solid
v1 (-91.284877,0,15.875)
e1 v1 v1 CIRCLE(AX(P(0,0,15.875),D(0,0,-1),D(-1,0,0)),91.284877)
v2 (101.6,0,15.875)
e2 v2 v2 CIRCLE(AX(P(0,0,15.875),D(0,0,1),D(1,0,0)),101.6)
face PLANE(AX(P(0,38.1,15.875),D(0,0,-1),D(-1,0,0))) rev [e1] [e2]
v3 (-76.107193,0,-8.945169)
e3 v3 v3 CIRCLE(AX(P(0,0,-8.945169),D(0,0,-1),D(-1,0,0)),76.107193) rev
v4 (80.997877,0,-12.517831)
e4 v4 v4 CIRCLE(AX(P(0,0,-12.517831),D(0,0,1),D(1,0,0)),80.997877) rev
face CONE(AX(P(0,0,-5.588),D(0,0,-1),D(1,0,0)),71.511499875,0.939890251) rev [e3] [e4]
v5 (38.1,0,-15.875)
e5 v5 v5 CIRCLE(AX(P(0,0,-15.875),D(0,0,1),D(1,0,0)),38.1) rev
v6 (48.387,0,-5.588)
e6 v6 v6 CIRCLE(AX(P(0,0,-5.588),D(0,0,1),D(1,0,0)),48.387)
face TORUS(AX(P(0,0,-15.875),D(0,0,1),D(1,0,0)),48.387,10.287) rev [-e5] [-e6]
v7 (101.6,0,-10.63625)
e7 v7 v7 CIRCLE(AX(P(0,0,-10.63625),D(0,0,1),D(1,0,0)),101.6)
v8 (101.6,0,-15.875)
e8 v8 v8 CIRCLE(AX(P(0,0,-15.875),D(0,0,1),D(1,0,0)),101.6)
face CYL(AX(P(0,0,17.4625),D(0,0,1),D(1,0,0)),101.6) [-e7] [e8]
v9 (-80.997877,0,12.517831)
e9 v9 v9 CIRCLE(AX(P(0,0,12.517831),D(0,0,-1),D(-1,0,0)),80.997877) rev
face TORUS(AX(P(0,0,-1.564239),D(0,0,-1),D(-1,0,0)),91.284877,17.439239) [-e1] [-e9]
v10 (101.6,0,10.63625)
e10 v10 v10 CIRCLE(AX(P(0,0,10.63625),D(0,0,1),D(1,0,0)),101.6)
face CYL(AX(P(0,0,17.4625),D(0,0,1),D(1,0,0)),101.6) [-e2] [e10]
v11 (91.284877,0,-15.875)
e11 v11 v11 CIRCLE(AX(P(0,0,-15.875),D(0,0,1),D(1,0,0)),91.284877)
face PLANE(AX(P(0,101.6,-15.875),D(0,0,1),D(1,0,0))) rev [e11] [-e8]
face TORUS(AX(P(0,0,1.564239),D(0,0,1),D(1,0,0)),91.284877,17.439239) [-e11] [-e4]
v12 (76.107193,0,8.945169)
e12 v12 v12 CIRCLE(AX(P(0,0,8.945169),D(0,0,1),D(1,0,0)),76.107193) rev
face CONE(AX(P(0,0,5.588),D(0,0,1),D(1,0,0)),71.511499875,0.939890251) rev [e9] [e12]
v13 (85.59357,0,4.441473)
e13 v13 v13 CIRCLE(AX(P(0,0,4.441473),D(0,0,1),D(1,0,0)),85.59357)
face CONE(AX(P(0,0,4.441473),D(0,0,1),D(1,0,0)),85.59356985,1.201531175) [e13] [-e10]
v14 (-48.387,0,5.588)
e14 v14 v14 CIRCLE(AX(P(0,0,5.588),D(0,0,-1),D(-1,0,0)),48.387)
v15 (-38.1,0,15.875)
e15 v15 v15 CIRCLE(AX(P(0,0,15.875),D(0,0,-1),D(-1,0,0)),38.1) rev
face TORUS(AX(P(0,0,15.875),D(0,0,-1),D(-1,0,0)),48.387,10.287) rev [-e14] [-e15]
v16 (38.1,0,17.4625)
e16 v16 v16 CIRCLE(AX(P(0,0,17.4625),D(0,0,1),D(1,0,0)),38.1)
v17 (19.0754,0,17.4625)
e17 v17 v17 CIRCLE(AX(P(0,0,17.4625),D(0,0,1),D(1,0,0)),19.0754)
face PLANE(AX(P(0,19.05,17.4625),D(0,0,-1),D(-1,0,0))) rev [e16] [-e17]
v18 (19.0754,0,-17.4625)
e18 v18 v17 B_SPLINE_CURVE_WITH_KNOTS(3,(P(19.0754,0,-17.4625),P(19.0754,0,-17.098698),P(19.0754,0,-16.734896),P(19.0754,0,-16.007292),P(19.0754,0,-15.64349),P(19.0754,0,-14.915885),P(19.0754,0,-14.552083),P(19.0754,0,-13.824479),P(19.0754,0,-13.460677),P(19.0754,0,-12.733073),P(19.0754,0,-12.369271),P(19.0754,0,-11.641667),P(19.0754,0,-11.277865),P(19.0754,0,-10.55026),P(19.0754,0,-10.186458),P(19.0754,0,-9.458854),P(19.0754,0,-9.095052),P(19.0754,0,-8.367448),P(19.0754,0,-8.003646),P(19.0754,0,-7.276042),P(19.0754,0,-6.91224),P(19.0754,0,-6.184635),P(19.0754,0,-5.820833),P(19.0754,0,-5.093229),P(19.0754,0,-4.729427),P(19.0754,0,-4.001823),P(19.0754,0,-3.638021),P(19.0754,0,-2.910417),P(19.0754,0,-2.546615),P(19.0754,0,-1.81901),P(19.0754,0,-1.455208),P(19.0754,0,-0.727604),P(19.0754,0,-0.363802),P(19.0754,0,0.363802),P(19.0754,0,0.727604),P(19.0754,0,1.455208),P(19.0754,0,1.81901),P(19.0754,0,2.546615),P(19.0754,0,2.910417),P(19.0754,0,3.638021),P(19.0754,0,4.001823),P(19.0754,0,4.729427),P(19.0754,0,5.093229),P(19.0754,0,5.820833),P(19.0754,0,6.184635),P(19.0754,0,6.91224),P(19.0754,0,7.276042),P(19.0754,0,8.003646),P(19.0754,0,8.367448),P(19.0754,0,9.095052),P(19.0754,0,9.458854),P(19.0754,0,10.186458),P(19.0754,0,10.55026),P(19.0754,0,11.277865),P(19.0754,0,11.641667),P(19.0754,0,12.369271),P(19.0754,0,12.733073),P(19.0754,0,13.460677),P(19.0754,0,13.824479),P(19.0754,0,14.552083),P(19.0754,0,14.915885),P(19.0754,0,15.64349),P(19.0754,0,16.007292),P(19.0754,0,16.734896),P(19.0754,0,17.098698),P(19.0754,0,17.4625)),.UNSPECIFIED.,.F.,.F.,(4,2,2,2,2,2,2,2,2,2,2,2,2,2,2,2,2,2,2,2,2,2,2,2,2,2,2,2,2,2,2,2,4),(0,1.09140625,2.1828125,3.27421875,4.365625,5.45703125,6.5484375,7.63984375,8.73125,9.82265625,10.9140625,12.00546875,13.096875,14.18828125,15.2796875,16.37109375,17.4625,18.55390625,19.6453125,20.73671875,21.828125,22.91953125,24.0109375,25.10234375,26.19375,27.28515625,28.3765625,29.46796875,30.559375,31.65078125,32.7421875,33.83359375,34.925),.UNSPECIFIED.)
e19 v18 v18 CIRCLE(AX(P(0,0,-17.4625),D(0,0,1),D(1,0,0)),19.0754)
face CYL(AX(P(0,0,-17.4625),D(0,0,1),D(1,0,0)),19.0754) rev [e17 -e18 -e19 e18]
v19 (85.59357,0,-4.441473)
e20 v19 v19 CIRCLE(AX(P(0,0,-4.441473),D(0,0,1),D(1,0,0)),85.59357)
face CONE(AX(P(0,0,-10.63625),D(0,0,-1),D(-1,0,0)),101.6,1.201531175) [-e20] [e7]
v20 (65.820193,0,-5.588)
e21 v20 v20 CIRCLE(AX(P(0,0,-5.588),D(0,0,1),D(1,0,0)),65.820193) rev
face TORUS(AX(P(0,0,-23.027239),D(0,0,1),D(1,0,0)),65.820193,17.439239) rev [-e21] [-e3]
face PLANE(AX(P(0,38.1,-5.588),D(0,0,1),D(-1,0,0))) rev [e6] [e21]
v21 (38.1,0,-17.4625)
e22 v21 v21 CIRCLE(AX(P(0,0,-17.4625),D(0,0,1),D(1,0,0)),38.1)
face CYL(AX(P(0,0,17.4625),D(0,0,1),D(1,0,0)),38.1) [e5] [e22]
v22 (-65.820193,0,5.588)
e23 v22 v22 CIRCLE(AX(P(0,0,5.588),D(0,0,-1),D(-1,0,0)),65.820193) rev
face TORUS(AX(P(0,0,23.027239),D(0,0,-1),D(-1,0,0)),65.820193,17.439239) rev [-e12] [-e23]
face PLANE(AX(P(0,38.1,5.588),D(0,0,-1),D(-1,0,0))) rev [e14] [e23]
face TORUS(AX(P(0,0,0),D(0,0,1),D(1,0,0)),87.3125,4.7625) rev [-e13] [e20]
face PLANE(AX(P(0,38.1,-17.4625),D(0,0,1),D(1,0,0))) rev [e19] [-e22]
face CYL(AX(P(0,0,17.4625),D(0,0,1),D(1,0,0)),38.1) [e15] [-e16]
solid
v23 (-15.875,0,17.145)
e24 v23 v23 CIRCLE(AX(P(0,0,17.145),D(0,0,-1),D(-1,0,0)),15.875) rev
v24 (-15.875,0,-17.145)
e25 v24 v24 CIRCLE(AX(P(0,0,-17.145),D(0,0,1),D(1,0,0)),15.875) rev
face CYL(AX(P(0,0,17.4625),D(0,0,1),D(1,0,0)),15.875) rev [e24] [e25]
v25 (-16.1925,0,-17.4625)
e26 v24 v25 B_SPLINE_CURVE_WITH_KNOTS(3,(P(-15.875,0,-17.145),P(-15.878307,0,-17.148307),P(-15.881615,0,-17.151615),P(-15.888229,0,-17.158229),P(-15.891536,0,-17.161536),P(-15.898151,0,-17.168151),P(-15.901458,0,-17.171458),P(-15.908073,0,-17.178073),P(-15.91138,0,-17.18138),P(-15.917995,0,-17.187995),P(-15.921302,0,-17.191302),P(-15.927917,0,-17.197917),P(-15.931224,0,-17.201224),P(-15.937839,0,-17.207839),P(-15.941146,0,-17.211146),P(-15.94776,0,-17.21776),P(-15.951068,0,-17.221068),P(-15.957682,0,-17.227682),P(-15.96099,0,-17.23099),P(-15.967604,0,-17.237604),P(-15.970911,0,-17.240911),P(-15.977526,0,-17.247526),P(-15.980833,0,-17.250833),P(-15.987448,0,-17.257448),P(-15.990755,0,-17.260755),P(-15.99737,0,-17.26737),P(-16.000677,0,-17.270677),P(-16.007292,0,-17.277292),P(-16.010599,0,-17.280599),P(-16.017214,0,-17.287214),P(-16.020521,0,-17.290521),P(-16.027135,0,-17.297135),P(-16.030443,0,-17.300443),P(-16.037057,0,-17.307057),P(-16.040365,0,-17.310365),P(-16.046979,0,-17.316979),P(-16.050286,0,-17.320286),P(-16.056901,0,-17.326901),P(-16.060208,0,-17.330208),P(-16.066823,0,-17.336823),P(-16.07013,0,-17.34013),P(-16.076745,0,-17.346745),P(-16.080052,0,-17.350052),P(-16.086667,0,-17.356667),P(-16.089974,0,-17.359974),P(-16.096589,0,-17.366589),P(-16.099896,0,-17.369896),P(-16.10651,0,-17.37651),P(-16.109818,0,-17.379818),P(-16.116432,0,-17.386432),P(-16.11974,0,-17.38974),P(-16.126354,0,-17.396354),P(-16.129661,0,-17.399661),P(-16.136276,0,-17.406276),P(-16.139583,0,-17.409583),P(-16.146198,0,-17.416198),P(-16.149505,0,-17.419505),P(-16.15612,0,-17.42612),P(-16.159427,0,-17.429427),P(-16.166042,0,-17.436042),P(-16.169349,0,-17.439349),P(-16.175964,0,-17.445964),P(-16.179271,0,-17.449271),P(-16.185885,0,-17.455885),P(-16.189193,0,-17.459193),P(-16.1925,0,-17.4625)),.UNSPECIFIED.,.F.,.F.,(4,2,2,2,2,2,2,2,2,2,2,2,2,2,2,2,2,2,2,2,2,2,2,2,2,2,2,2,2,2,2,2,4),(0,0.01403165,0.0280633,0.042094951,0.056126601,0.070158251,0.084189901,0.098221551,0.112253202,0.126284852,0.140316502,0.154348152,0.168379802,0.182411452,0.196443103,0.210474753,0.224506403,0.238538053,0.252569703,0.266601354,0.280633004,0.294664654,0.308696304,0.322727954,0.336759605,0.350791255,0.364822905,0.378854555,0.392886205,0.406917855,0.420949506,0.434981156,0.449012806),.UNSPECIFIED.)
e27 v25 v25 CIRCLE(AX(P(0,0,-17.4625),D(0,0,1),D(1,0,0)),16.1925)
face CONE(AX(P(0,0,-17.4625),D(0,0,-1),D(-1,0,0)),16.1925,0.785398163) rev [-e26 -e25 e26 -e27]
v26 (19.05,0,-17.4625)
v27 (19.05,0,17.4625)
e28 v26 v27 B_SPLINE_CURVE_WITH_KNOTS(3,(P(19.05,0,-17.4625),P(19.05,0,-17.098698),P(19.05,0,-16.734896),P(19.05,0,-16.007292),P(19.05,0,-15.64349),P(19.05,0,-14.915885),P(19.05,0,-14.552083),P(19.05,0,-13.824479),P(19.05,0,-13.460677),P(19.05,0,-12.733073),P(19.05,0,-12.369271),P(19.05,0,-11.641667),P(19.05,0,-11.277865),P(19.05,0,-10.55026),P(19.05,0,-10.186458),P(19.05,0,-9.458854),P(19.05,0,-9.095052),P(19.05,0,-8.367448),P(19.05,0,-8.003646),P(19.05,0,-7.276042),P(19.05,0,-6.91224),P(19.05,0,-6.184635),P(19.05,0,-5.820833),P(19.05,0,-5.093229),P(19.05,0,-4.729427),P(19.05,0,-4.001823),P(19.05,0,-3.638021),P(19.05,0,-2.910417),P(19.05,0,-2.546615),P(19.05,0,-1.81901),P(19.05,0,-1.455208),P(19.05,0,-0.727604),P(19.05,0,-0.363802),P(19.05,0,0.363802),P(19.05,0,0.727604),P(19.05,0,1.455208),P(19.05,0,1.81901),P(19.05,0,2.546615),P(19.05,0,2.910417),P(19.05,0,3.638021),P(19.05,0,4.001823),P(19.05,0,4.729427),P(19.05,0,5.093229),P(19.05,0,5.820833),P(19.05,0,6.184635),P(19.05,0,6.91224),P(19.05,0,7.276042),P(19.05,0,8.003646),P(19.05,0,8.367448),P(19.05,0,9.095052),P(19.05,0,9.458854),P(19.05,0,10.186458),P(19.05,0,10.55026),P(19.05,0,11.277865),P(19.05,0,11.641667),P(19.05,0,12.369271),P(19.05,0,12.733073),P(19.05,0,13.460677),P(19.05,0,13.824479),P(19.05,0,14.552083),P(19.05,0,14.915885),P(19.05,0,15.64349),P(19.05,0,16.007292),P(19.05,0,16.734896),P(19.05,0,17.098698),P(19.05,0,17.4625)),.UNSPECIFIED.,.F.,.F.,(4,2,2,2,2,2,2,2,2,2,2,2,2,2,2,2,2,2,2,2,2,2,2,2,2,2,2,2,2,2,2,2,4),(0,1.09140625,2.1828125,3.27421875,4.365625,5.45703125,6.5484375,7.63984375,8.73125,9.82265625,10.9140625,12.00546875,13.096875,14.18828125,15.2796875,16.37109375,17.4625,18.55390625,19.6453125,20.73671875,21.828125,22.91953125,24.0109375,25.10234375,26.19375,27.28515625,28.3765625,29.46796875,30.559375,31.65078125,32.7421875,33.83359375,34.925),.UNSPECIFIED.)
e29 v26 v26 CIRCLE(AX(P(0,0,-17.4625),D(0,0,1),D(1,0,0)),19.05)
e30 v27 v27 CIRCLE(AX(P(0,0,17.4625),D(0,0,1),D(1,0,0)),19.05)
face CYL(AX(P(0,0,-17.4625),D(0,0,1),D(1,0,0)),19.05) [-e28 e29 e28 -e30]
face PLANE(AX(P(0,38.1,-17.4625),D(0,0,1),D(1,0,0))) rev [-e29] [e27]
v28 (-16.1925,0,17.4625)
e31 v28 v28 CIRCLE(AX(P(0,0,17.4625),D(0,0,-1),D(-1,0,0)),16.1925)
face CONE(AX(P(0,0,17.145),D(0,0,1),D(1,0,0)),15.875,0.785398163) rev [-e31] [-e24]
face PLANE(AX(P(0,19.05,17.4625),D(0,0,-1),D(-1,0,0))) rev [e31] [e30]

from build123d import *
from build123d.topology import SkipClean

# Parameters (mm, degrees)
CUT_EXTRUDE_THIN1_DEPTH      = 145.741351749
CUT_EXTRUDE_THIN1_DEPTH_BACK = 145.741351749
SKETCH2_R                    = 19.0754
SKETCH2_R_2                  = 19.05
CHAMFER1_SIZE                = 0.3175
FILLET2_R                    = 17.439239198
FILLET3_R                    = 10.287


with BuildPart() as part:
    # Sketch1 → Revolve1 (revolve)
    with BuildSketch(Plane(origin=(0, 0, 0), x_dir=(0, 0, -1), z_dir=(1, 0, 0)), mode=Mode.PRIVATE) as revolve1_sk:
        with BuildLine():
            Line((10.63625, 101.6), (15.875, 101.6))
            Line((15.875, 101.6), (15.875, 38.1))
            Line((15.875, 38.1), (17.4625, 38.1))
            Line((17.4625, 38.1), (17.4625, 19.05))
            Line((17.4625, 19.05), (17.4625, 15.875))
            Line((17.4625, 15.875), (-17.4625, 15.875))
            Line((-17.4625, 15.875), (-17.4625, 19.05))
            Line((-17.4625, 19.05), (-17.4625, 38.1))
            Line((-17.4625, 38.1), (-15.875, 38.1))
            Line((-15.875, 38.1), (-15.875, 101.6))
            Line((-15.875, 101.6), (-10.63625, 101.6))
            Line((-10.63625, 101.6), (-4.441473336, 85.59356985))
            ThreePointArc((-4.441473336, 85.59356985), (0, 82.55), (4.441473336, 85.59356985))
            Line((4.441473336, 85.59356985), (10.63625, 101.6))
        make_face()
    revolve(revolve1_sk.sketch.rotate(Axis((0, 0, 17.4625), (0, 0, -1)), 90), axis=Axis((0, 0, 17.4625), (0, 0, -1)))

    # Sketch2 → Cut-Extrude-Thin1 (cut, two sides: drawn at the far end of the back side and taken through both)
    with BuildSketch(Plane.XY.offset(-CUT_EXTRUDE_THIN1_DEPTH_BACK)):
        Circle(SKETCH2_R)
        Circle(SKETCH2_R_2, mode=Mode.SUBTRACT)
    extrude(amount=CUT_EXTRUDE_THIN1_DEPTH + CUT_EXTRUDE_THIN1_DEPTH_BACK, mode=Mode.SUBTRACT)


with BuildPart() as cut_extrude_thin1_piece_1:
    # of the separate pieces the step leaves, piece 1, a body of its own (cut_extrude_thin1_pieces)
    add(part.part.solids().sort_by_distance((85.59356985, 0, -4.441473336))[0])

    # Sketch3 → Cut-Revolve1 (revolve, cut)
    with SkipClean():  # the faces are left unmerged after this step: merging them gives an invalid solid
        with BuildSketch(Plane(origin=(0, 0, 0), x_dir=(0, 0, -1), z_dir=(1, 0, 0)), mode=Mode.PRIVATE) as cut_revolve1_sk:
            Polygon((-15.875, 38.1), (-5.588, 38.1), (-5.588, 71.511499875), (-15.875, 85.59356985), align=None)
        cut_revolve1 = revolve(cut_revolve1_sk.sketch.rotate(Axis((0, 0, 5.588), (0, 0, 1)), 90), axis=Axis((0, 0, 5.588), (0, 0, 1)), mode=Mode.SUBTRACT)

    # Mirror1: Cut-Revolve1 across plane
    with SkipClean():  # the faces are left unmerged after this step: merging them gives an invalid solid
        add(cut_revolve1.mirror(Plane.XY), mode=Mode.SUBTRACT)

    # Fillet2
    fillet2_edges = [cut_extrude_thin1_piece_1.edges().sort_by_distance(p)[0] for p in [
        (71.511499875, 0, 5.588),
        (85.59356985, 0, 15.875),
        (85.59356985, 0, -15.875),
        (71.511499875, 0, -5.588),
    ]]
    fillet(fillet2_edges, radius=FILLET2_R)

    # Fillet3
    fillet3_edges = [cut_extrude_thin1_piece_1.edges().sort_by_distance(p)[0] for p in [
        (38.1, 0, 5.588),
        (38.1, 0, -5.588),
    ]]
    fillet(fillet3_edges, radius=FILLET3_R - 0.0001)  # a hair under: the kernel refuses the full size


with BuildPart() as cut_extrude_thin1_piece_2:
    # of the separate pieces the step leaves, piece 2, a body of its own (cut_extrude_thin1_pieces)
    add(part.part.solids().sort_by_distance((19.05, 0, -17.4625))[0])

    # Chamfer1
    chamfer1_edges = [cut_extrude_thin1_piece_2.edges().sort_by_distance(p)[0] for p in [
        (-15.875, 0, -17.4625),
        (-15.875, 0, 17.4625),
    ]]
    chamfer(chamfer1_edges, length=CHAMFER1_SIZE)


solid = Compound([cut_extrude_thin1_piece_1.part, cut_extrude_thin1_piece_2.part])
